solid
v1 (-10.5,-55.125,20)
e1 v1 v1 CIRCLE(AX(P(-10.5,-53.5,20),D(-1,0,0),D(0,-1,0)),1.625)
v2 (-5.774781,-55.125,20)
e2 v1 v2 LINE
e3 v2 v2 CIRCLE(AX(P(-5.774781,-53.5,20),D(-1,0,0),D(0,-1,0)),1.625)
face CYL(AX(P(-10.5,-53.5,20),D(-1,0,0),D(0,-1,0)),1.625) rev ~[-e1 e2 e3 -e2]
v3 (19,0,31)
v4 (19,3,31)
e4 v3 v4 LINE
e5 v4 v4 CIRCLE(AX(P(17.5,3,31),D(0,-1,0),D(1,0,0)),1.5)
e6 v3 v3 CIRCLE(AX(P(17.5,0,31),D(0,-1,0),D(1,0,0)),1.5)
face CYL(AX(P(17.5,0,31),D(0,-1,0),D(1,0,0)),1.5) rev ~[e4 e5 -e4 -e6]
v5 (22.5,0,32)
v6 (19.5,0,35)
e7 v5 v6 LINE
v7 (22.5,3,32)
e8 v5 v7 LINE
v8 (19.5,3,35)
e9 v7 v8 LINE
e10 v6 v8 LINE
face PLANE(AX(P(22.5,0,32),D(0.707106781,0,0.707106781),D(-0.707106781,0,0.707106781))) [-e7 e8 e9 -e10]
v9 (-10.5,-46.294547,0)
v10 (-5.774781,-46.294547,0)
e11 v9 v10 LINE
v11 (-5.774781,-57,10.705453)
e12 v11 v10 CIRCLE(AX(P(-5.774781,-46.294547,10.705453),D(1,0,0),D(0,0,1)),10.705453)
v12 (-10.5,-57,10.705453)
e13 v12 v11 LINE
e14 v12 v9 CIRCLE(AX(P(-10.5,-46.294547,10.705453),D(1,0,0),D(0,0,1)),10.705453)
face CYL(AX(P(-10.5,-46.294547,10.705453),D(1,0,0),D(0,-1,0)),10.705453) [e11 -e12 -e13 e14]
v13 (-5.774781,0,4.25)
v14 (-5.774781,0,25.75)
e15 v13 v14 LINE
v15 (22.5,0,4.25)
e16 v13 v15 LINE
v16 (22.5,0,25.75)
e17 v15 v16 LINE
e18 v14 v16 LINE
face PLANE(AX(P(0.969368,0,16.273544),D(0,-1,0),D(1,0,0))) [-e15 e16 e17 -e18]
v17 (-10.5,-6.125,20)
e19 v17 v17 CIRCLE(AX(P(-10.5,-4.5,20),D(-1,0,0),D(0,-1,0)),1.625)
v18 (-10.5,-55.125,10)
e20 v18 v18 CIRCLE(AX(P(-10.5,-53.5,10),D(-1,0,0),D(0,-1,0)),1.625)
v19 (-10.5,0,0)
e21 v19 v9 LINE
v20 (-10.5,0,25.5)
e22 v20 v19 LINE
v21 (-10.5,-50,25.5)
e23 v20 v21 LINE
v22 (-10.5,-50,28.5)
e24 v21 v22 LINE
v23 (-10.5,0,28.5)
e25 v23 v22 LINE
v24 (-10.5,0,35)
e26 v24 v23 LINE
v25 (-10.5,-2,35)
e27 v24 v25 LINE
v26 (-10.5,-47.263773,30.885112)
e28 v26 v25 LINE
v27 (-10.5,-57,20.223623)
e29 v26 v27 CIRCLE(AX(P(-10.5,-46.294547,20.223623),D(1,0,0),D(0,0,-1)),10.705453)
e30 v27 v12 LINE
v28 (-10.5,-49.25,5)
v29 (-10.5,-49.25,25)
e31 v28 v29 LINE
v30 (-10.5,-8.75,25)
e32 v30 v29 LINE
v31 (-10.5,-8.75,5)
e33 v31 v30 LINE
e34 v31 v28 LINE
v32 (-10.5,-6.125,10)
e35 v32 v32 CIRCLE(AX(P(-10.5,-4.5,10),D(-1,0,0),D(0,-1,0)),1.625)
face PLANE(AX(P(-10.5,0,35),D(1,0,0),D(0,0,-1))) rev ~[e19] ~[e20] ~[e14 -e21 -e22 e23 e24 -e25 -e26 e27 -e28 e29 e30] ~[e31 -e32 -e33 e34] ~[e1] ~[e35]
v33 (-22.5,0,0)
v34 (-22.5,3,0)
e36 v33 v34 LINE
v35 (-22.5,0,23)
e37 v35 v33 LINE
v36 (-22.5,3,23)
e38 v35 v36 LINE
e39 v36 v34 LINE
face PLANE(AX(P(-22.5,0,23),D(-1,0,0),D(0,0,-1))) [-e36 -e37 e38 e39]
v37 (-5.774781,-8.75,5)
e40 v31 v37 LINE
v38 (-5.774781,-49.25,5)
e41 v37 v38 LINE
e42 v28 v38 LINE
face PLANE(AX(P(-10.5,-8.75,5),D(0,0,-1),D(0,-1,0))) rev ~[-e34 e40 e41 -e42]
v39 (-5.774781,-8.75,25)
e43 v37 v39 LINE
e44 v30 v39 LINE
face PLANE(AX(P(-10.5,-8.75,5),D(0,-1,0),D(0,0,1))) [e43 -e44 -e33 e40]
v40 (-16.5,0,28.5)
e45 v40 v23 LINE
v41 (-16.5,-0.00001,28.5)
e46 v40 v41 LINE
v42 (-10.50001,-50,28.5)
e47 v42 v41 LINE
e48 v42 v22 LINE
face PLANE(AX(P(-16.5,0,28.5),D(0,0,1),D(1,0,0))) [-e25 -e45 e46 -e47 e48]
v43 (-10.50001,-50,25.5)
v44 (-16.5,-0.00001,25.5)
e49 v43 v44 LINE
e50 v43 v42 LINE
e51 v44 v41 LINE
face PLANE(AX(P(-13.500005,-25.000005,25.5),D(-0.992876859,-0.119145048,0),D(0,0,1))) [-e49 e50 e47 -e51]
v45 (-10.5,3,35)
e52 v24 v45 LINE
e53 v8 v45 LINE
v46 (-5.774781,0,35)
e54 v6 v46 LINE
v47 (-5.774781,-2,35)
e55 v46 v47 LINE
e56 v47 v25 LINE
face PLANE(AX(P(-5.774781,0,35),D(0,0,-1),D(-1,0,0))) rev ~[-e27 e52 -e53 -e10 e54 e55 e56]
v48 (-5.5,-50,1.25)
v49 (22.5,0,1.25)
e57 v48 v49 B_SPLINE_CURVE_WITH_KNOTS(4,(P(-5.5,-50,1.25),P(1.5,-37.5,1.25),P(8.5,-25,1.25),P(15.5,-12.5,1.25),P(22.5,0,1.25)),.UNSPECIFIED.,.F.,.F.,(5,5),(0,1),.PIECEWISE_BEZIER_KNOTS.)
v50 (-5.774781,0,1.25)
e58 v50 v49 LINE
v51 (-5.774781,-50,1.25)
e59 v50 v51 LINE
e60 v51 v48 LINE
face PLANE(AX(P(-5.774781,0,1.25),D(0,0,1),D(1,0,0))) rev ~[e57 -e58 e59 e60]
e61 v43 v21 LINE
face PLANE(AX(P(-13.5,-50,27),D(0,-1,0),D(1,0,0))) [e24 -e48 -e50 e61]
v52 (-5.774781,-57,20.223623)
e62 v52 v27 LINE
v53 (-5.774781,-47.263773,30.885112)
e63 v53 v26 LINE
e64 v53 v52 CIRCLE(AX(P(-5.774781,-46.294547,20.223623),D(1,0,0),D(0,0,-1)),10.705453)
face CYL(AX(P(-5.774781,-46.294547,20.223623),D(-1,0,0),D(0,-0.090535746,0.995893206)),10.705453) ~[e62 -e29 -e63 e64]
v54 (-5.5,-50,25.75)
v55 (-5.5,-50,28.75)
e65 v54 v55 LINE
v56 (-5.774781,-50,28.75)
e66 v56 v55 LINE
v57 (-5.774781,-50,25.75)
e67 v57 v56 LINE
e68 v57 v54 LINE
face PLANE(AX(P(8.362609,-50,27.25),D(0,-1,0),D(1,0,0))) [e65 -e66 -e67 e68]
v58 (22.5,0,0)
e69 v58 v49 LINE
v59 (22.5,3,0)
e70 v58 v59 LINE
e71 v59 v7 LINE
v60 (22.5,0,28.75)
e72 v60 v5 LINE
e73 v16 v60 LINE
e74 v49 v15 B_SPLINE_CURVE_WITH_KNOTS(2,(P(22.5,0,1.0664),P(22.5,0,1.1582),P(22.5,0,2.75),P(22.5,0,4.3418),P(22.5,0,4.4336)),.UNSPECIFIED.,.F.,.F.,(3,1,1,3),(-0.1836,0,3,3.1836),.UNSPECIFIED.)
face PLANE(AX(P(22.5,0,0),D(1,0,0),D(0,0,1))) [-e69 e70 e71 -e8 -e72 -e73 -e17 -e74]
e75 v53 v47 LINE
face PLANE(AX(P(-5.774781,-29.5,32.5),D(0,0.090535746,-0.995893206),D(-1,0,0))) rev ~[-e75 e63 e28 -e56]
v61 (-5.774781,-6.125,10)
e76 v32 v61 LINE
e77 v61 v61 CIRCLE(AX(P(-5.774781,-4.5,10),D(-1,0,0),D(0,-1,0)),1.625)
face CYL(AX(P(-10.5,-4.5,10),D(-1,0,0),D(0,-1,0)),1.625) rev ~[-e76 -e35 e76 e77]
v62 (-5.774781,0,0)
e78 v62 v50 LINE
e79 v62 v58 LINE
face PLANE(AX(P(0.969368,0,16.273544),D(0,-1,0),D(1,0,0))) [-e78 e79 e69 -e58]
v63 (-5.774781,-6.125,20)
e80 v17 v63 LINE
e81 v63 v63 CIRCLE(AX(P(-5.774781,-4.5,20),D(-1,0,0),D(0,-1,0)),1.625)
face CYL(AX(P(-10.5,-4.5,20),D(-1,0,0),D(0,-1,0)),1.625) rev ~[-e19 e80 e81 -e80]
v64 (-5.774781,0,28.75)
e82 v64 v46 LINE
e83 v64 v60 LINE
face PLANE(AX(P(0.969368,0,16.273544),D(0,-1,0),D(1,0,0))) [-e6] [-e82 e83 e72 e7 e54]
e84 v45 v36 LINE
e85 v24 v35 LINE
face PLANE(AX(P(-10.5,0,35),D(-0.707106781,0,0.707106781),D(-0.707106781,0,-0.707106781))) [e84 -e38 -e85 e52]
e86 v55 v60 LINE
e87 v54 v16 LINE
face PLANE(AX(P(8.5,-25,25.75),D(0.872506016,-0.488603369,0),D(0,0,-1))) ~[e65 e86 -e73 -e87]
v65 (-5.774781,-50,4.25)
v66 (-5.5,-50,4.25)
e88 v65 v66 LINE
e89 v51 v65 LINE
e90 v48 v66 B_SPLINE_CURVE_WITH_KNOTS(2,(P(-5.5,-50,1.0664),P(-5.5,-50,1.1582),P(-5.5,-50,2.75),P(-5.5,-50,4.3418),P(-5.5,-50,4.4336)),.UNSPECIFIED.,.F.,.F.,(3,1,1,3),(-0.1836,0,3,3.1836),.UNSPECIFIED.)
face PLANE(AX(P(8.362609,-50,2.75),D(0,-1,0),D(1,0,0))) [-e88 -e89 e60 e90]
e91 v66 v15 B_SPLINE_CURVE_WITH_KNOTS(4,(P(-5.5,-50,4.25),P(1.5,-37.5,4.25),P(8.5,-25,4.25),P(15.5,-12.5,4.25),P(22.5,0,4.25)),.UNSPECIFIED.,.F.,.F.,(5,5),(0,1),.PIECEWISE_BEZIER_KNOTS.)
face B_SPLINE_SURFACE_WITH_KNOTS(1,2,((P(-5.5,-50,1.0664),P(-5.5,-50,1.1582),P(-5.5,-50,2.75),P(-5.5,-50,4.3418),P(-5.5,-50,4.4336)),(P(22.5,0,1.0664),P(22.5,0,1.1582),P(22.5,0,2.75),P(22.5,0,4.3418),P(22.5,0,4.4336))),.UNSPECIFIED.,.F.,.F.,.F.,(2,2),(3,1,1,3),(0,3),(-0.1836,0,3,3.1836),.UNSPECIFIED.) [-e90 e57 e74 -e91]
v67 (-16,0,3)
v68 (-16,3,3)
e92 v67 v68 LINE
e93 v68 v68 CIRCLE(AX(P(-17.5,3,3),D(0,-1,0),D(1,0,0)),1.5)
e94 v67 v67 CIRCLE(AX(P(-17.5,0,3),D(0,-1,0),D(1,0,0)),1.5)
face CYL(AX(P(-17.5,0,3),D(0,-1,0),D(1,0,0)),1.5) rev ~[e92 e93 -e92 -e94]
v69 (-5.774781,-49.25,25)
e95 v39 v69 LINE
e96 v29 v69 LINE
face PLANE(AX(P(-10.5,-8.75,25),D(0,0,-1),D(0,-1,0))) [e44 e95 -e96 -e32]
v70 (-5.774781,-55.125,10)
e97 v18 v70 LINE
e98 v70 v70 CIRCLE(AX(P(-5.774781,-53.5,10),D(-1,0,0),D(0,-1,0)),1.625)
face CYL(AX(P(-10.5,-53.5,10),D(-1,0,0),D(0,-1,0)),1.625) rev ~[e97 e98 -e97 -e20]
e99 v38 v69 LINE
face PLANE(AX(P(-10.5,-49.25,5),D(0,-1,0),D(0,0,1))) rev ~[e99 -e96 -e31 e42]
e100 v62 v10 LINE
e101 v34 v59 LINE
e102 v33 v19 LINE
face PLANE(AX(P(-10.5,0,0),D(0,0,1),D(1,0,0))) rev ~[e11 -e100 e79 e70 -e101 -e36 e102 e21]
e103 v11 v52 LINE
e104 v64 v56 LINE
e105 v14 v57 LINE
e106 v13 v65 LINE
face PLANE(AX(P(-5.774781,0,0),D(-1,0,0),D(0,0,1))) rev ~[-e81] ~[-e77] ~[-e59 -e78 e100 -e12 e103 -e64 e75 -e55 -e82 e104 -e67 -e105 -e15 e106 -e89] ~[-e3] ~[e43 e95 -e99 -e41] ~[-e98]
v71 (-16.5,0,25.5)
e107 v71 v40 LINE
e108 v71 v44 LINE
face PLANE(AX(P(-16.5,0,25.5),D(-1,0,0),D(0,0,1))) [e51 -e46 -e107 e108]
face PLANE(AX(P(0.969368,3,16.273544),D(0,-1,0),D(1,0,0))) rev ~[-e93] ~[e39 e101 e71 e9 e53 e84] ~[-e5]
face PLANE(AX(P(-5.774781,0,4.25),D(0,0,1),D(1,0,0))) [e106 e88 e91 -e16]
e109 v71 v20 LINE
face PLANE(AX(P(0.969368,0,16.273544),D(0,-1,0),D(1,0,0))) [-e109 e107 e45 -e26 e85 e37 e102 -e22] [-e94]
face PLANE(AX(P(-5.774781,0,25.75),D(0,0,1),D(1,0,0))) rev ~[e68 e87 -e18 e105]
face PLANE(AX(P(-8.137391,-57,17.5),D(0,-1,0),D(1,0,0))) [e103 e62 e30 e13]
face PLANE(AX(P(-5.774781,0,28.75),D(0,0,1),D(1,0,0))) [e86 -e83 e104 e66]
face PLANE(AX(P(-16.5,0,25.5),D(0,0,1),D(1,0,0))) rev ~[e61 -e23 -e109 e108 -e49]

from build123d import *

# Parameters (mm, degrees)
F0_R       = 1.5
F1_DEPTH   = 3
F3_DEPTH   = 57
F4_R       = 1.625
F4_W       = 40.5
F4_H       = 20
F5_DEPTH   = 33.001
F2_W       = 28.2747811079
F2_H       = 3
F6_DEPTH   = 50
F7_SIZE2   = 50
F7_SIZE    = 28
F7_2_SIZE2 = 50
F7_2_SIZE  = 28
F8_SIZE2   = 55
F8_SIZE    = 5
F9_R       = 10.70545329
F10_W      = 6
F10_H      = 3
F11_DEPTH  = 50
F12_SIZE2  = 49.99999
F12_SIZE   = 5.99999


# Not quite as in the source:
# - a fillet or chamfer is up to 0.001 mm smaller than in the source, because OpenCascade refuses the exact size


with BuildPart() as f1:
    # F0 (on Front) → F1 (new body)
    with BuildSketch(Plane.XZ):
        Polygon((-22.5, 23), (-22.5, 0), (22.5, 0), (22.5, 32), (19.5, 35), (-10.5, 35), align=None)
        with Locations((-17.5, 3)):
            Circle(F0_R, mode=Mode.SUBTRACT)
        with Locations((17.5, 31)):
            Circle(F0_R, mode=Mode.SUBTRACT)
    extrude(amount=-F1_DEPTH)

    # F2 (on face) → F3 (join)
    with BuildSketch(Plane.XZ):
        Polygon((-5.7747811079, 35), (-10.5, 35), (-10.5, 0), (-5.7747811079, 0), (-5.7747811079, 1.25), (-5.7747811079, 4.25), (-5.7747811079, 25.75), (-5.7747811079, 28.75), align=None)
    extrude(amount=F3_DEPTH)

    # F4 (on face) → F5 (cut, through all)
    with BuildSketch(Plane(origin=(-10.5, 0, 0), x_dir=(0, -1, 0), z_dir=(-1, 0, 0))):
        with Locations((4.5, 20)):
            Circle(F4_R)
        with Locations((4.5, 10)):
            Circle(F4_R)
        with Locations((29, 15)):
            Rectangle(F4_W, F4_H)
        with Locations((53.5, 20)):
            Circle(F4_R)
        with Locations((53.5, 10)):
            Circle(F4_R)
    extrude(amount=-F5_DEPTH, mode=Mode.SUBTRACT)

    # F2 (on face) → F6 (join)
    with BuildSketch(Plane.XZ):
        with Locations((8.362609446, 27.25)):
            Rectangle(F2_W, F2_H)
        with Locations((8.362609446, 2.75)):
            Rectangle(F2_W, F2_H)
    extrude(amount=F6_DEPTH)

    # F7
    f7_edges = [f1.edges().sort_by_distance(p)[0] for p in [
        (22.5, -50, 27.25),
    ]]
    f7_side = f1.faces().sort_by_distance((8.362609, -50, 27.25))[0]
    chamfer(f7_edges, length=F7_SIZE, length2=F7_SIZE2, reference=f7_side)

    # F7#2
    f7_2_edges = [f1.edges().sort_by_distance(p)[0] for p in [
        (22.5, -50, 2.75),
    ]]
    f7_2_side = f1.faces().sort_by_distance((8.362609, -50, 2.75))[0]
    chamfer(f7_2_edges, length=F7_2_SIZE, length2=F7_2_SIZE2, reference=f7_2_side)

    # F8
    f8_edges = [f1.edges().sort_by_distance(p)[0] for p in [
        (-8.137391, -57, 35),
    ]]
    chamfer(f8_edges, length=F8_SIZE, length2=F8_SIZE2)

    # F9
    f9_edges = [f1.edges().sort_by_distance(p)[0] for p in [
        (-8.137391, -57, 30),
        (-8.137391, -57, 0),
    ]]
    fillet(f9_edges, radius=F9_R)

    # F10 (on face) → F11 (join)
    with BuildSketch(Plane.XZ):
        with Locations((-13.5, 27)):
            Rectangle(F10_W, F10_H)
    extrude(amount=F11_DEPTH)

    # F12 (size 6 and 50 in the source; OpenCascade refuses exactly that, so slightly less here)
    f12_edges = [f1.edges().sort_by_distance(p)[0] for p in [
        (-16.5, -50, 27),
    ]]
    f12_side = f1.faces().sort_by_distance((-13.5, -50, 27))[0]
    chamfer(f12_edges, length=F12_SIZE, length2=F12_SIZE2, reference=f12_side)


solid = f1.part
